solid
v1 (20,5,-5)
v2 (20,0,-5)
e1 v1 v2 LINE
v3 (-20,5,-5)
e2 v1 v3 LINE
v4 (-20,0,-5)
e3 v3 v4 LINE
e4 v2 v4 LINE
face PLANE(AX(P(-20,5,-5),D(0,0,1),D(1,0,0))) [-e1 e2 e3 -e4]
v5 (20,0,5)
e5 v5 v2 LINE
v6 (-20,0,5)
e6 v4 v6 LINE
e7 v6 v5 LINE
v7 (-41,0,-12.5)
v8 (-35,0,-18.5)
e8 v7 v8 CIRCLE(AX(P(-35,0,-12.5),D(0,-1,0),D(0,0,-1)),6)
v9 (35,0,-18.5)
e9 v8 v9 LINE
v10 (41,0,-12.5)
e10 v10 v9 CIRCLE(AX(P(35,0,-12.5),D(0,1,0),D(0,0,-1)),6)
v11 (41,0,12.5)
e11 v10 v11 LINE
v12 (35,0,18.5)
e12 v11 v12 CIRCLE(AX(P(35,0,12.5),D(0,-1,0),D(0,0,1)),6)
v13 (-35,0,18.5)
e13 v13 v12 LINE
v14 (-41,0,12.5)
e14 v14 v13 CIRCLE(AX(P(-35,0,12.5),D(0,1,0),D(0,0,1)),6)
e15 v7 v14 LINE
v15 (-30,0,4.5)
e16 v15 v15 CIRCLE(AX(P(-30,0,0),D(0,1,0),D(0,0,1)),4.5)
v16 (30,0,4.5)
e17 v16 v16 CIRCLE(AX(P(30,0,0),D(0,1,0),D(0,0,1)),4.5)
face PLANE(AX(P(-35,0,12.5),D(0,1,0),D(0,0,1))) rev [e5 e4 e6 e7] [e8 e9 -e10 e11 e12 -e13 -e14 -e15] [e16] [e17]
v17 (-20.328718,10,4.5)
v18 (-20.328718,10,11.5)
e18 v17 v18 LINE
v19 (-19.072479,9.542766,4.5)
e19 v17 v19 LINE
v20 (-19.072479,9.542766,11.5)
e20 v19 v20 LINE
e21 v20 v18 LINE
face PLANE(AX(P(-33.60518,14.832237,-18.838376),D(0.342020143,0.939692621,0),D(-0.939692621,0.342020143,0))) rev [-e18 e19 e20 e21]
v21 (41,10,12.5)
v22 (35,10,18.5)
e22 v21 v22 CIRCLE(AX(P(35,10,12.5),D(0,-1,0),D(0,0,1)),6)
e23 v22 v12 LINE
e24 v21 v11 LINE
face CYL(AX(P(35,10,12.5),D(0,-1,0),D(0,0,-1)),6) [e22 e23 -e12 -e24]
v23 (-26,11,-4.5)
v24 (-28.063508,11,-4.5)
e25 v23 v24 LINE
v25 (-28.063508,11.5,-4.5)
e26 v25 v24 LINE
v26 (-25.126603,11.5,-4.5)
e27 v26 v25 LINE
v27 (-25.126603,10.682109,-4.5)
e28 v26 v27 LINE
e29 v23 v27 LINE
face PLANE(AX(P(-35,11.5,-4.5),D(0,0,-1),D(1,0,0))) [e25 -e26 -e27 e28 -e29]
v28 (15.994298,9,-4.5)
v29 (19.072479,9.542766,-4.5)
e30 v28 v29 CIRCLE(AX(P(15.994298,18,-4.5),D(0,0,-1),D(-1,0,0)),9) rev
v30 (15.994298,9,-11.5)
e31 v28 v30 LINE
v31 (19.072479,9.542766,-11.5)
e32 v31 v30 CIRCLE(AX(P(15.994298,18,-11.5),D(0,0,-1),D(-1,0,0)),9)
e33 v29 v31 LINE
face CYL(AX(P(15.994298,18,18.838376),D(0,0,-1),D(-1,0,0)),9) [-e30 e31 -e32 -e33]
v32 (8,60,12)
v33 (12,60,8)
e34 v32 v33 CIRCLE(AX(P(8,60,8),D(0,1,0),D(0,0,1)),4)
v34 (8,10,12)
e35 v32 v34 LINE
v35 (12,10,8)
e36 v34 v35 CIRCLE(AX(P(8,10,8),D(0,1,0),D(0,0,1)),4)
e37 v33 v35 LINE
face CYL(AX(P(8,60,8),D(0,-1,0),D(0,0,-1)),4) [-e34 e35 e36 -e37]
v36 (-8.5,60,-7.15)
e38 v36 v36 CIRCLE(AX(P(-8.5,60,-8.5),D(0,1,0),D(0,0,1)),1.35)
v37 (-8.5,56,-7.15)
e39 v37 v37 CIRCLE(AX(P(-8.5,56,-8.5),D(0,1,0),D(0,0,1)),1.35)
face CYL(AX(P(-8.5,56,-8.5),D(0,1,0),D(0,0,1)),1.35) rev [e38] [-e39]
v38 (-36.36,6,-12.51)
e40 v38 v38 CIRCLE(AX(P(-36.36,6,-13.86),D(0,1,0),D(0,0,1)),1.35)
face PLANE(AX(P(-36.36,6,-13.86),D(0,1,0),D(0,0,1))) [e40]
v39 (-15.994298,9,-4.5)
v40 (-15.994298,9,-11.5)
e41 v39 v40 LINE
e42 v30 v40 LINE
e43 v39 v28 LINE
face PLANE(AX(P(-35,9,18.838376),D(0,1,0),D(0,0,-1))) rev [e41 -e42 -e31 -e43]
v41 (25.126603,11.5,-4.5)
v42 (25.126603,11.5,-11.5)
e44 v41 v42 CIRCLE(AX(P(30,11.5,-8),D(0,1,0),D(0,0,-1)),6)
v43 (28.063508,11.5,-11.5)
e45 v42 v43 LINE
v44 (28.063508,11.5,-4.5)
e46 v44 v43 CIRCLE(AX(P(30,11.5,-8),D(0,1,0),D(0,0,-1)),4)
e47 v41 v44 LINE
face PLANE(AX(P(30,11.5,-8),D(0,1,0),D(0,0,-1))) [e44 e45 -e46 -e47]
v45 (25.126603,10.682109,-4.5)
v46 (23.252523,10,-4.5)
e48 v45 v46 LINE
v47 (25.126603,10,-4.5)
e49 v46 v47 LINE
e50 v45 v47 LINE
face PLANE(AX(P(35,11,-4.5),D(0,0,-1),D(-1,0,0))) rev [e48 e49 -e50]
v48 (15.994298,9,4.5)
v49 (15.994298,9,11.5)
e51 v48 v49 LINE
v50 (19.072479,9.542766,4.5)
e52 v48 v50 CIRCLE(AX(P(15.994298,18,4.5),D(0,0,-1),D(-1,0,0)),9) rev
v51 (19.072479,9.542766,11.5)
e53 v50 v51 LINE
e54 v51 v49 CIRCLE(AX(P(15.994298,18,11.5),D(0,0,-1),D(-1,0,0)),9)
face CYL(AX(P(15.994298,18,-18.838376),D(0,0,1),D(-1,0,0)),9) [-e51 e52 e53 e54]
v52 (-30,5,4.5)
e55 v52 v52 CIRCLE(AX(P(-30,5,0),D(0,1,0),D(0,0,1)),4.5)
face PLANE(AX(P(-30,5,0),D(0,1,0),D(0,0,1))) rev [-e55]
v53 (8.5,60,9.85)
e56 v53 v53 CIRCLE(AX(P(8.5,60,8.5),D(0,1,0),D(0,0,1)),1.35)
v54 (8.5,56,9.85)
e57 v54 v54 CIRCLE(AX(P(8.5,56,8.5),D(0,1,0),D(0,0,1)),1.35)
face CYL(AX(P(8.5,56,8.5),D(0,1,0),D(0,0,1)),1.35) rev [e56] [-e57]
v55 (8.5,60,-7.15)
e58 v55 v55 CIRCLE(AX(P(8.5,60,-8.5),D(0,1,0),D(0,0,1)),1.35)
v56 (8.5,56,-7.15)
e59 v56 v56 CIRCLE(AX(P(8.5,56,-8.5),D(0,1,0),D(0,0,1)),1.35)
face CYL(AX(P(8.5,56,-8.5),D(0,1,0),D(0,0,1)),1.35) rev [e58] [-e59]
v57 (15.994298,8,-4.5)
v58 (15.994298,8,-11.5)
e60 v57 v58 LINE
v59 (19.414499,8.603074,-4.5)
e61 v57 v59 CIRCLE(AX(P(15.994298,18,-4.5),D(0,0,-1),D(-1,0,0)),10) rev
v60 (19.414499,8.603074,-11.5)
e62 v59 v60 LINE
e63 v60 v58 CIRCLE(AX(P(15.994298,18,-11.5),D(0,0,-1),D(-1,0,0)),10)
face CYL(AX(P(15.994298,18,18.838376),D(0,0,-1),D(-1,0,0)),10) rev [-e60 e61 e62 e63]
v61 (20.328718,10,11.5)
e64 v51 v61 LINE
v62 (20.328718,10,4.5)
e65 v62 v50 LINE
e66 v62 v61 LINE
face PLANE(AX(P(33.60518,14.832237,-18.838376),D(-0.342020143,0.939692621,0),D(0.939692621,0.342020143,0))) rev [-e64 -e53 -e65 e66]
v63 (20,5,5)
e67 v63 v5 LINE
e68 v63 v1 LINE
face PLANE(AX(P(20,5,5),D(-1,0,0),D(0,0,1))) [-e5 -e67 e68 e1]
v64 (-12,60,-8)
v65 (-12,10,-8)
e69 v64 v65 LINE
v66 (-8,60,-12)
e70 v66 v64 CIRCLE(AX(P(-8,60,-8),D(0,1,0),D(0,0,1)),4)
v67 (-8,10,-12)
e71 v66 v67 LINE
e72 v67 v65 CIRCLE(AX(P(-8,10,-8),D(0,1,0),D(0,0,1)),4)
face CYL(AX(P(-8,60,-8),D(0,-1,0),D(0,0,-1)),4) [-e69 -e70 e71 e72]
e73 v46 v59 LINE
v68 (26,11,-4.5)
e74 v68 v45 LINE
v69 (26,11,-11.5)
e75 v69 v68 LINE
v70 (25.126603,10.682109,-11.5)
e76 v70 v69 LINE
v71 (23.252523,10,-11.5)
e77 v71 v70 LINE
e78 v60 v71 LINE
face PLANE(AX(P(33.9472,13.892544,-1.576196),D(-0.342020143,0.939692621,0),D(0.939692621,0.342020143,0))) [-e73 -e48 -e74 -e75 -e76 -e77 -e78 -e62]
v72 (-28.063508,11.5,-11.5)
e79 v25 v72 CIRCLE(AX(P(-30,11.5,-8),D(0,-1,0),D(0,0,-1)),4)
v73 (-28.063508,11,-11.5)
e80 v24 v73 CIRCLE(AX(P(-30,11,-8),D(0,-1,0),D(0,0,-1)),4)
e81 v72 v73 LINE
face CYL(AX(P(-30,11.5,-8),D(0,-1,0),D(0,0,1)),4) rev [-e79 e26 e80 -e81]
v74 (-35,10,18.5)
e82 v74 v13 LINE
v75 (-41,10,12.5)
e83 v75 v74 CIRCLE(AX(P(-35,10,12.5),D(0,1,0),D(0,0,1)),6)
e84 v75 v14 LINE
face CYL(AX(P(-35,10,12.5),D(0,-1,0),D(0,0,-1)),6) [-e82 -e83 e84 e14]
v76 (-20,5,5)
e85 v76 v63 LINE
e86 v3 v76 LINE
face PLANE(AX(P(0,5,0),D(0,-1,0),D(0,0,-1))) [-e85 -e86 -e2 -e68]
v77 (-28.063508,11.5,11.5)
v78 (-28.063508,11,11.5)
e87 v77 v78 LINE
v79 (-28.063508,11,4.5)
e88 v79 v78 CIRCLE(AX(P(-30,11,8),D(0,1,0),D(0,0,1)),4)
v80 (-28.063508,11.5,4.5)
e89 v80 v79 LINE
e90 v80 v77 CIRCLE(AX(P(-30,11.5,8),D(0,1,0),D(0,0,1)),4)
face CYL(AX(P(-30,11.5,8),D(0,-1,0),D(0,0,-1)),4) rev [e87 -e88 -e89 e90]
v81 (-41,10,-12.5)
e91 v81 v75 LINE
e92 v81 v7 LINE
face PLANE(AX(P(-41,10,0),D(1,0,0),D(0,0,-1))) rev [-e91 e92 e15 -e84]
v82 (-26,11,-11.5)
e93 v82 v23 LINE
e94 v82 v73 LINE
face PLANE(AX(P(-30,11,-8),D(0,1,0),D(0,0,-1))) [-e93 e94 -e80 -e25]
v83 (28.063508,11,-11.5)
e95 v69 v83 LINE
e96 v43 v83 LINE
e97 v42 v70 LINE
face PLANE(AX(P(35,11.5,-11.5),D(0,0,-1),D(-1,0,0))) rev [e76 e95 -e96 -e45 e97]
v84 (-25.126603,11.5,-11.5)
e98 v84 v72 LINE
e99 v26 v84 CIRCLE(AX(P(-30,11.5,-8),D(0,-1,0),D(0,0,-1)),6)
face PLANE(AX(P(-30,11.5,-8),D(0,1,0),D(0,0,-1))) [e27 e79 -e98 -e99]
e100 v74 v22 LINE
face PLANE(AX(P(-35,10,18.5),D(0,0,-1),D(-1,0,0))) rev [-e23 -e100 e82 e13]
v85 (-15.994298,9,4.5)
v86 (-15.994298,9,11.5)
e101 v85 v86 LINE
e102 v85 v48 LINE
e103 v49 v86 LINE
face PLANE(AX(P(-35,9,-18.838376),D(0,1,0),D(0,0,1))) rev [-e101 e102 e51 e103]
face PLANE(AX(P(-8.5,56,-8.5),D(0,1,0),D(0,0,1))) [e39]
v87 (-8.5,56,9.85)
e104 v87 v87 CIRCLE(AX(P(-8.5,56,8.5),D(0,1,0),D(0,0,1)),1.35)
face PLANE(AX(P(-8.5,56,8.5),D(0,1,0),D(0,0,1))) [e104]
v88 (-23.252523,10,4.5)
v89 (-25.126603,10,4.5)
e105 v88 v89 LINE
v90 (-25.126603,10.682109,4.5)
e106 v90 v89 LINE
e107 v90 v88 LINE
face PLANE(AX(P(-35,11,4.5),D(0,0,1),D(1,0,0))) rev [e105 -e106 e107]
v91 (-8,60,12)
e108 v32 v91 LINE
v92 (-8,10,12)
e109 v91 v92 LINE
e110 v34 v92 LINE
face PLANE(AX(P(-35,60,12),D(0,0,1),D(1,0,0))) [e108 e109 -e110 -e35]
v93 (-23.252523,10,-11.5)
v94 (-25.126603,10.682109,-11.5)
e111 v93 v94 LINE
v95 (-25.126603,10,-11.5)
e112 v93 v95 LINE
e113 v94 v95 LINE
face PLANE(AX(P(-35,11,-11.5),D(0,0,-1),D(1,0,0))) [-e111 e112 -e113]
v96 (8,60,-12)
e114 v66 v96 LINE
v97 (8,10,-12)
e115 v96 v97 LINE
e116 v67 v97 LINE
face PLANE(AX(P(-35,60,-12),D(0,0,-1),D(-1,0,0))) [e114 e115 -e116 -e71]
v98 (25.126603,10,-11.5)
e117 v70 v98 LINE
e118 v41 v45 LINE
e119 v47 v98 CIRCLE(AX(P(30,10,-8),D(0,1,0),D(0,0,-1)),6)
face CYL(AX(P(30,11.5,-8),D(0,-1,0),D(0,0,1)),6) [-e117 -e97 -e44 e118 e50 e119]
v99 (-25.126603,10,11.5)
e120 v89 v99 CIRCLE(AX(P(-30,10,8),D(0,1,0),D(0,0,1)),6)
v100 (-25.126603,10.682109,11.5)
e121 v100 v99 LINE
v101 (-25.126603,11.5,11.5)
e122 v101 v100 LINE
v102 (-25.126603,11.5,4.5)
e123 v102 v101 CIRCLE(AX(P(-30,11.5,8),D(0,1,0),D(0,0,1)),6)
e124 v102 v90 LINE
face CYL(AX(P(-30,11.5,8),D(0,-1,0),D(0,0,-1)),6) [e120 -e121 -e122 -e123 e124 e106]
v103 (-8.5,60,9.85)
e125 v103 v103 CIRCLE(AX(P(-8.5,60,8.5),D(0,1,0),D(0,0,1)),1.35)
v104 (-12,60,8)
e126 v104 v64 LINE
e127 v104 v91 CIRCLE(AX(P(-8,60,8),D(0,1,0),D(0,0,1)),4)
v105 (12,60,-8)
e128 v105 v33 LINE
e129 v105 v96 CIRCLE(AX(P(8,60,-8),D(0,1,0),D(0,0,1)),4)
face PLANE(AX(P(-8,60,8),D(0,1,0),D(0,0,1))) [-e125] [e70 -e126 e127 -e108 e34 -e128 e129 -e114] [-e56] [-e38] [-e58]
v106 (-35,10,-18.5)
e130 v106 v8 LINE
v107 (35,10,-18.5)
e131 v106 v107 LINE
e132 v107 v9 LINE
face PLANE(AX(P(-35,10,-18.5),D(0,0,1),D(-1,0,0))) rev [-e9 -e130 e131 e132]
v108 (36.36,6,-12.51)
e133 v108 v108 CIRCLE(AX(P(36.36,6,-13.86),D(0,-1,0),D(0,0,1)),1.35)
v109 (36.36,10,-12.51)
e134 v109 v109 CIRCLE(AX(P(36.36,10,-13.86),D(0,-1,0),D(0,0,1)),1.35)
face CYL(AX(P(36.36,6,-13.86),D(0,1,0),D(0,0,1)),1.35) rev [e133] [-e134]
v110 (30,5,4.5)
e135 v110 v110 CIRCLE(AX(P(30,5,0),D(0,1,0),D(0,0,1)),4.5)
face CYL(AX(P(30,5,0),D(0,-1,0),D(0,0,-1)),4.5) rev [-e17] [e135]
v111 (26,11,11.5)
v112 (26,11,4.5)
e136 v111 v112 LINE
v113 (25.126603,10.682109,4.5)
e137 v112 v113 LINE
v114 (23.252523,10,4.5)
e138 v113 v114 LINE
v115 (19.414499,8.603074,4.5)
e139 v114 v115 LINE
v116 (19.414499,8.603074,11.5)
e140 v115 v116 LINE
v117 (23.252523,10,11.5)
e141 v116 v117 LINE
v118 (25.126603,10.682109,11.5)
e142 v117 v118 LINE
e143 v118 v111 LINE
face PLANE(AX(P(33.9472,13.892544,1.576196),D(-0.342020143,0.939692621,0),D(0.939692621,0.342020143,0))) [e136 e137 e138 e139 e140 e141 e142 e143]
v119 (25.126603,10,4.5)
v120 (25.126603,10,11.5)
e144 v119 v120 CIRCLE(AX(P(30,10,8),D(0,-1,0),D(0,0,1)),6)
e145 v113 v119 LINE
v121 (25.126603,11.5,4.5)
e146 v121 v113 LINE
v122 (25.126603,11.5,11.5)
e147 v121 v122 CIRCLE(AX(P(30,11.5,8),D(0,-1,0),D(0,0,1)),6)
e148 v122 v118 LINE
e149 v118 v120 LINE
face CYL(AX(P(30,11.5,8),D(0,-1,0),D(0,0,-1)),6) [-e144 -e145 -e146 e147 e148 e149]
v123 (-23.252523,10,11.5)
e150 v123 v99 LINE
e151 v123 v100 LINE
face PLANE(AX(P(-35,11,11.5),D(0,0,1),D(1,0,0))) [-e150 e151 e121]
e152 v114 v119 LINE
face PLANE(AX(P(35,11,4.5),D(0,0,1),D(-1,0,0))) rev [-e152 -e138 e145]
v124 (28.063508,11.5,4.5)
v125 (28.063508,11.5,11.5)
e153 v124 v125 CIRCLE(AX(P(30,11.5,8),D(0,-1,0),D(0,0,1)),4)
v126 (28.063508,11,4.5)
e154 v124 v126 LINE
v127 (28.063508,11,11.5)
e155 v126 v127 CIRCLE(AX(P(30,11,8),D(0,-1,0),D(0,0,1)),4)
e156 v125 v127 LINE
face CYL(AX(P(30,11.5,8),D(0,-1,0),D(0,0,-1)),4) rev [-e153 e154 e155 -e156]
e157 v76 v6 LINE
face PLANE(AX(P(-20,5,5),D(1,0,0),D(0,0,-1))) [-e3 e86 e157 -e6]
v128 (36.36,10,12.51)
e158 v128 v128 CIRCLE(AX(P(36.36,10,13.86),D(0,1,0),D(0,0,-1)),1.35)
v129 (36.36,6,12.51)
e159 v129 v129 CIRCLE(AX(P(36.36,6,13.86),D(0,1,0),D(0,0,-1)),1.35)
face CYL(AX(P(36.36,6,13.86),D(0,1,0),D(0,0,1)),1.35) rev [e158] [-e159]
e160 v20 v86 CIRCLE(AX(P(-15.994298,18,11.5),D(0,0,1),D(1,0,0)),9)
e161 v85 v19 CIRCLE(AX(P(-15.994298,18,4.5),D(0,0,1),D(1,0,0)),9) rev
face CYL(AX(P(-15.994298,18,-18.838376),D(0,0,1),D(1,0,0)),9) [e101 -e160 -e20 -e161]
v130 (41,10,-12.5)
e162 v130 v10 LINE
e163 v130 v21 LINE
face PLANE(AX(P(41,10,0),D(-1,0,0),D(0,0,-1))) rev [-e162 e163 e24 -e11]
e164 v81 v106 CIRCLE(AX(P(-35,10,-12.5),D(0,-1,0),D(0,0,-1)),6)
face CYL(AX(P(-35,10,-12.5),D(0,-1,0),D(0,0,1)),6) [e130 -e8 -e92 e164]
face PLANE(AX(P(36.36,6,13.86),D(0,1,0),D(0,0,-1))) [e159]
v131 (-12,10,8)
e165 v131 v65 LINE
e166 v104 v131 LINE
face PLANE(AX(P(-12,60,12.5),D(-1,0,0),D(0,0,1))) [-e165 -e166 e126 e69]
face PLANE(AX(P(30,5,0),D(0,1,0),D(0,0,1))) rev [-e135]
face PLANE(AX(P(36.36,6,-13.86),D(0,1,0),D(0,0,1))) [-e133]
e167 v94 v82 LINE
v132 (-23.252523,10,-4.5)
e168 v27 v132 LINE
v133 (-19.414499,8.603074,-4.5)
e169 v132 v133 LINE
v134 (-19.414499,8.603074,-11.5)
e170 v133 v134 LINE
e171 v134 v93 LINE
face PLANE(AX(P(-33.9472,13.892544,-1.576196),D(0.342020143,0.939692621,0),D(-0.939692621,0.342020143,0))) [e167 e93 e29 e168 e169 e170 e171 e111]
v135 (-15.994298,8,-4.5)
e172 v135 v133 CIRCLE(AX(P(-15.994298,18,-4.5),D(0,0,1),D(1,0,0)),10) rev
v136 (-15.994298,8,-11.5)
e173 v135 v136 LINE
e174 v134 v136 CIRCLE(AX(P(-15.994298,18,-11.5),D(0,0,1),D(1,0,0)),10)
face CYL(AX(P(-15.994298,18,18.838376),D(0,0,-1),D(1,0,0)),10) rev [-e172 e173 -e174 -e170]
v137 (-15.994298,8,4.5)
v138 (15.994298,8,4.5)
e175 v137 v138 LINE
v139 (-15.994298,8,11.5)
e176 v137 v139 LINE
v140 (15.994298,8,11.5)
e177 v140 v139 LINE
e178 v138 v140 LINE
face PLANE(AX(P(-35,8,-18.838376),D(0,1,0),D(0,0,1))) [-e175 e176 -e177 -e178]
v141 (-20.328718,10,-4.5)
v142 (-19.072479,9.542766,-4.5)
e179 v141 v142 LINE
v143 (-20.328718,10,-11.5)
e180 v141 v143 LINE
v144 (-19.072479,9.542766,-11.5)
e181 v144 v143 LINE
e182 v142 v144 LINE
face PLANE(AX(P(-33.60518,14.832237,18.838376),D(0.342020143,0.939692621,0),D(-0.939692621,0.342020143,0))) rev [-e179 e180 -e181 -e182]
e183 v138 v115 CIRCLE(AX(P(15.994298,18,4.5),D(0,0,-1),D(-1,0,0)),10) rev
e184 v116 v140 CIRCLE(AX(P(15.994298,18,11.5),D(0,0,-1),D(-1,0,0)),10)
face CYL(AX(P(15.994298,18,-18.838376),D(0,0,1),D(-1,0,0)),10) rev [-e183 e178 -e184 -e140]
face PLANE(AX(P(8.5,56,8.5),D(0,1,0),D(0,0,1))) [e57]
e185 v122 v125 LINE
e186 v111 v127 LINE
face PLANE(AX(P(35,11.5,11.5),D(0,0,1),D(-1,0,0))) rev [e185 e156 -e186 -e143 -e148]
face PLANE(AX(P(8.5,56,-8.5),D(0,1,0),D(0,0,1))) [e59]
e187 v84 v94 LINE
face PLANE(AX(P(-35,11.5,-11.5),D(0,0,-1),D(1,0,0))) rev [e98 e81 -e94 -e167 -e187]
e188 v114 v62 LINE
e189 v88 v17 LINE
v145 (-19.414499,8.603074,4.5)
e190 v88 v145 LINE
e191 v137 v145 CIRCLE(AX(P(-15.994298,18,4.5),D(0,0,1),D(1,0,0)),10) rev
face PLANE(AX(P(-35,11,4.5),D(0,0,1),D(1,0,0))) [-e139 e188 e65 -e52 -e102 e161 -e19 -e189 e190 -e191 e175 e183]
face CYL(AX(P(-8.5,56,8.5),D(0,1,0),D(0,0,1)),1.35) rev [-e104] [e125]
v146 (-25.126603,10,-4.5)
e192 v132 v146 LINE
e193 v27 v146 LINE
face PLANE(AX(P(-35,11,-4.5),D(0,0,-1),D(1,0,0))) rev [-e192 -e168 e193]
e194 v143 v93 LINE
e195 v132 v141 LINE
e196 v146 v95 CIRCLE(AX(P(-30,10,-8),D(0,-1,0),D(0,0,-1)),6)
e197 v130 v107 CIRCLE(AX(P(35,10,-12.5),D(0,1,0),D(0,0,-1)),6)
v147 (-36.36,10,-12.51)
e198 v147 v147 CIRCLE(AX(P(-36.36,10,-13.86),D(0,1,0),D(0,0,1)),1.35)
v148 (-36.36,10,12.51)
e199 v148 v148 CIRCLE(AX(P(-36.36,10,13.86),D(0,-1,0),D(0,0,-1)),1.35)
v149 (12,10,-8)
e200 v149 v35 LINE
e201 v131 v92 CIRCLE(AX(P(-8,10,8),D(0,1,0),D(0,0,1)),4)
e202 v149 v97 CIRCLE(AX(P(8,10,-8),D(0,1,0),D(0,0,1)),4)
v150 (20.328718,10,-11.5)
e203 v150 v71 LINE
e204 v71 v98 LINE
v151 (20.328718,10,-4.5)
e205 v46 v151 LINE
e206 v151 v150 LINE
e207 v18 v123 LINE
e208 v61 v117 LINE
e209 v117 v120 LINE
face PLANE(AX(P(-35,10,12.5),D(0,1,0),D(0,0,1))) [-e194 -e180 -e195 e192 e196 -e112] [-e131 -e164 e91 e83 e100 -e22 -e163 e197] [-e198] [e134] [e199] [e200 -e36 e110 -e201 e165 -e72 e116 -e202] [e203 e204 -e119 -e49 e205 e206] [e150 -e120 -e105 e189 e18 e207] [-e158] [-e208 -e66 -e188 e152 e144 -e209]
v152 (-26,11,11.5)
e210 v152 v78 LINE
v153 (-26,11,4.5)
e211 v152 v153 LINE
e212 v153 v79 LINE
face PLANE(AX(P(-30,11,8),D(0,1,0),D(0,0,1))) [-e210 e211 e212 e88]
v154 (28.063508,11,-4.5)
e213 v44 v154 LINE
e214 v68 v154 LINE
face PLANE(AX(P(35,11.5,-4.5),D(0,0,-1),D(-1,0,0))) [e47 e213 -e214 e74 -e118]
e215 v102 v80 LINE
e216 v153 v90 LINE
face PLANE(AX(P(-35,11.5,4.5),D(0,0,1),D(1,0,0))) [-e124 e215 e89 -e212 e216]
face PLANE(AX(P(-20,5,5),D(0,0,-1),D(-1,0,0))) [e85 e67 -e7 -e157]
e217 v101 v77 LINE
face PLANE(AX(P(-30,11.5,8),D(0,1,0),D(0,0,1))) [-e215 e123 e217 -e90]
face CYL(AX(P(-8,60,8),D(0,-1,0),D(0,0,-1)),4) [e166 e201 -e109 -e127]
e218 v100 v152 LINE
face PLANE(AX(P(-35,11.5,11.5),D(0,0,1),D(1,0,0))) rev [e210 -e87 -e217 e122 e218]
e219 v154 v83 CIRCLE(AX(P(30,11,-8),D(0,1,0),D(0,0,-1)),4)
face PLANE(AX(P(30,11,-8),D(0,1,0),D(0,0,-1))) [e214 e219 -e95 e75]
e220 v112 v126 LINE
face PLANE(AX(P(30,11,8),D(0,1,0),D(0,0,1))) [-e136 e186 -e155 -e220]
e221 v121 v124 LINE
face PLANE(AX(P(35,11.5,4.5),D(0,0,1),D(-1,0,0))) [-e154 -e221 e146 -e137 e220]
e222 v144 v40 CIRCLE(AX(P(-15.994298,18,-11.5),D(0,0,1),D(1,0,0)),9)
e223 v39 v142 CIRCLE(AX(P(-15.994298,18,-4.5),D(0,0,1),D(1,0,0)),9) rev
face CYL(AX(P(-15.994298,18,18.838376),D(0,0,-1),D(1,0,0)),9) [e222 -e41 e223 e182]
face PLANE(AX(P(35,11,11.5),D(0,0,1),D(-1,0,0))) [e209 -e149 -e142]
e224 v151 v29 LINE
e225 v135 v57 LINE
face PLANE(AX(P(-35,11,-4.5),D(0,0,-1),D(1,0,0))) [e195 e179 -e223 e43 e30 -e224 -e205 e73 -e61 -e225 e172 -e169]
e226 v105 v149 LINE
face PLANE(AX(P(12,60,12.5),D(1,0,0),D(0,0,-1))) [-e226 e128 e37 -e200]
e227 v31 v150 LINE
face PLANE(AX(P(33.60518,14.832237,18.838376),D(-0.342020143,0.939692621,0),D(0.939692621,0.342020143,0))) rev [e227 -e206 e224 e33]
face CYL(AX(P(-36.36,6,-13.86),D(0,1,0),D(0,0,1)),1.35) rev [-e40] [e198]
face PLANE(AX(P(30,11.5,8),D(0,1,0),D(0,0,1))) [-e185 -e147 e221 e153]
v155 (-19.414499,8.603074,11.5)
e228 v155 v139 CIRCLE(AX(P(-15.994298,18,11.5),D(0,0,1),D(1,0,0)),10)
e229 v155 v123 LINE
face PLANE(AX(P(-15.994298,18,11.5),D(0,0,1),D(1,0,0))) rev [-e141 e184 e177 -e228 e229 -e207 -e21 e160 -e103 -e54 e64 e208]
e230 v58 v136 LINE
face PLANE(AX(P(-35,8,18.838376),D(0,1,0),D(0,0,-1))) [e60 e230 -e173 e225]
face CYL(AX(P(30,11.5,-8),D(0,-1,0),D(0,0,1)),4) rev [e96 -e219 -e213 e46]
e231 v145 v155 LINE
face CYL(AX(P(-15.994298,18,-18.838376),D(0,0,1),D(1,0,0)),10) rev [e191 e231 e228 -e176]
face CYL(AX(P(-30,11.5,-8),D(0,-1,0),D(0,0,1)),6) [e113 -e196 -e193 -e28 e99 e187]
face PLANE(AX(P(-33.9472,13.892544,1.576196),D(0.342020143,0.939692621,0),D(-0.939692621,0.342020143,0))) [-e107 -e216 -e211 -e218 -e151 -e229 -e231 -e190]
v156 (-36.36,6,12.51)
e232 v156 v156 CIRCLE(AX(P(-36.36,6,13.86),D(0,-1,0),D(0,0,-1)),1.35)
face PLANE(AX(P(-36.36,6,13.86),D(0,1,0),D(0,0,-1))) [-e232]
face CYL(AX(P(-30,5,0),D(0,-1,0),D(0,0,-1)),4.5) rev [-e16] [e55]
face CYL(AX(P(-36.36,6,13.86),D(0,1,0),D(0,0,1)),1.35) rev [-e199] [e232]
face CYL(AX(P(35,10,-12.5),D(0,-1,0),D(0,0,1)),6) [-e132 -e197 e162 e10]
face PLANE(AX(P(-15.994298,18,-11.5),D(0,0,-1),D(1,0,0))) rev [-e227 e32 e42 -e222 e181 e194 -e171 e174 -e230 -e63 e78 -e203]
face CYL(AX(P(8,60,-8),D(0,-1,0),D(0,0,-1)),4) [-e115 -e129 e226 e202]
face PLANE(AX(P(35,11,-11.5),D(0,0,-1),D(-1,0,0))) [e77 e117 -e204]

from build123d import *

# Parameters (mm, degrees)
BOSS_EXTRUDE1_DEPTH                        = 10
BOSS_EXTRUDE2_START                        = 10
SKETCH4_R                                  = 4
BOSS_EXTRUDE2_DEPTH                        = 1
BOSS_EXTRUDE4_START                        = 11.5
BOSS_EXTRUDE4_DEPTH                        = 7
CUT_EXTRUDE2_START                         = 11.5
CUT_EXTRUDE2_DEPTH                         = 7
BOSS_EXTRUDE3_START                        = 10
BOSS_EXTRUDE3_DEPTH                        = 1.5
MIRROR4_DEPTH                              = 8
MIRROR4_START                              = 8
MIRROR4_2_DEPTH                            = 2
MIRROR4_START_2                            = 10
MIRROR4_3_DEPTH                            = 1.5
MIRROR4_4_DEPTH                            = 3
MIRROR4_START_3                            = -11.5
MIRROR4_5_DEPTH                            = 7
MIRROR4_START_4                            = 4.5
MIRROR4_6_DEPTH                            = 7
SKETCH2_R                                  = 4.5
SKETCH2_W                                  = 40
SKETCH2_H                                  = 10
CUT_EXTRUDE1_DEPTH                         = 5
BOSS_EXTRUDE5_START                        = 10
BOSS_EXTRUDE5_DEPTH                        = 50
SKETCH8_R                                  = 1.35
CUT_EXTRUDE3_DEPTH                         = 4
SKETCH9_R                                  = 1.35
CUT_EXTRUDE4_DEPTH                         = 4
MIRROR5_AT_THE_SECOND_PLANE_COPY_1_SKETC_R = 1.35
MIRROR5_AT_THE_SECOND_PLANE_COPY_1_DEPTH   = 4


with BuildPart() as part:
    # Sketch3 → Boss-Extrude1 (new body)
    with BuildSketch(Plane(origin=(0, 0, 0), x_dir=(1, 0, 0), z_dir=(0, 1, 0))):
        with BuildLine():
            Line((-41, 0), (-41, -12.5))
            ThreePointArc((-41, -12.5), (-39.242640687, -16.742640687), (-35, -18.5))
            Line((-35, -18.5), (0, -18.5))
            Line((0, -18.5), (0, 0))
            Line((0, 0), (-41, 0))
        make_face()
    extrude(amount=BOSS_EXTRUDE1_DEPTH)

    # Sketch4 → Boss-Extrude2 (add)
    with BuildSketch(Plane(origin=(0, 0, 0), x_dir=(1, 0, 0), z_dir=(0, 1, 0)).offset(BOSS_EXTRUDE2_START)):
        with Locations((-30, -8)):
            Circle(SKETCH4_R)
        with BuildLine():
            Line((-26, -4.5), (-28.063508327, -4.5))
            ThreePointArc((-28.063508327, -4.5), (-26.554280431, -5.968493994), (-26, -8))
            Line((-26, -8), (-26, -4.5))
        make_face()
        with BuildLine():
            Line((-26, -11.5), (-26, -8))
            ThreePointArc((-26, -8), (-26.554280431, -10.031506006), (-28.063508327, -11.5))
            Line((-28.063508327, -11.5), (-26, -11.5))
        make_face()
    extrude(amount=BOSS_EXTRUDE2_DEPTH)

    # Sketch6 → Boss-Extrude4 (add)
    with BuildSketch(Plane.XY.offset(BOSS_EXTRUDE4_START)):
        Polygon((-23.252522581, 10), (-26, 11), (-26, 10), align=None)
    extrude(amount=-BOSS_EXTRUDE4_DEPTH)

    # Sketch6<3> → Cut-Extrude2 (cut)
    with BuildSketch(Plane.XY.offset(CUT_EXTRUDE2_START)):
        with BuildLine():
            Line((-20.32871818, 10), (-23.252522581, 10))
            Line((-23.252522581, 10), (-19.414499368, 8.603073792))
            ThreePointArc((-19.414499368, 8.603073792), (-17.730779711, 8.15192247), (-15.994297935, 8))
            Line((-15.994297935, 8), (0, 8))
            Line((0, 8), (0, 9))
            Line((0, 9), (-15.994297935, 9))
            ThreePointArc((-15.994297935, 9), (-17.557131534, 9.136730223), (-19.072479224, 9.542766413))
            Line((-19.072479224, 9.542766413), (-20.32871818, 10))
        make_face()
    extrude(amount=-CUT_EXTRUDE2_DEPTH, mode=Mode.SUBTRACT)

    # Sketch4<3> → Boss-Extrude3 (add)
    with BuildSketch(Plane(origin=(0, 0, 0), x_dir=(1, 0, 0), z_dir=(0, 1, 0)).offset(BOSS_EXTRUDE3_START)):
        with BuildLine():
            ThreePointArc((-28.063508327, -11.5), (-34, -8), (-28.063508327, -4.5))
            Line((-28.063508327, -4.5), (-26, -4.5))
            Line((-26, -4.5), (-25.126602828, -4.5))
            ThreePointArc((-25.126602828, -4.5), (-36, -8), (-25.126602828, -11.5))
            Line((-25.126602828, -11.5), (-26, -11.5))
            Line((-26, -11.5), (-28.063508327, -11.5))
        make_face()
    extrude(amount=BOSS_EXTRUDE3_DEPTH)

    # Mirror4: read off the stored shape, not the designer's step
    # Mirror4 outline → Mirror4 (add)
    with BuildSketch(Plane(origin=(0, 0, 0), x_dir=(1, 0, 0), z_dir=(0, 1, 0))):
        with BuildLine():
            Line((0, -18.5), (35, -18.5))
            ThreePointArc((35, -18.5), (39.242640687, -16.742640687), (41, -12.5))
            Line((41, -12.5), (41, 12.5))
            ThreePointArc((41, 12.5), (39.242640687, 16.742640687), (35, 18.5))
            Line((35, 18.5), (-35, 18.5))
            ThreePointArc((-35, 18.5), (-39.242640687, 16.742640687), (-41, 12.5))
            Line((-41, 12.5), (-41, 0))
            Line((-41, 0), (0, 0))
            Line((0, 0), (0, -18.5))
        make_face()
    extrude(amount=MIRROR4_DEPTH)

    # Mirror4 2 outline → Mirror4 2 (add)
    with BuildSketch(Plane(origin=(0, 0, 0), x_dir=(1, 0, 0), z_dir=(0, 1, 0)).offset(MIRROR4_START)):
        with BuildLine():
            Line((0, -11.5), (0, -18.5))
            Line((0, -18.5), (35, -18.5))
            ThreePointArc((35, -18.5), (39.242640687, -16.742640687), (41, -12.5))
            Line((41, -12.5), (41, 12.5))
            ThreePointArc((41, 12.5), (39.242640687, 16.742640687), (35, 18.5))
            Line((35, 18.5), (-35, 18.5))
            ThreePointArc((-35, 18.5), (-39.242640687, 16.742640687), (-41, 12.5))
            Line((-41, 12.5), (-41, 0))
            Line((-41, 0), (0, 0))
            Line((0, 0), (0, -4.5))
            Line((0, -4.5), (28.063508327, -4.5))
            ThreePointArc((28.063508327, -4.5), (34, -8), (28.063508327, -11.5))
            Line((28.063508327, -11.5), (0, -11.5))
        make_face()
        with BuildLine():
            ThreePointArc((28.063508327, 11.5), (34, 8), (28.063508327, 4.5))
            Line((28.063508327, 4.5), (-28.063508327, 4.5))
            ThreePointArc((-28.063508327, 4.5), (-34, 8), (-28.063508327, 11.5))
            Line((-28.063508327, 11.5), (28.063508327, 11.5))
        make_face(mode=Mode.SUBTRACT)
    extrude(amount=MIRROR4_2_DEPTH)

    # Mirror4 3 outline → Mirror4 3 (add)
    with BuildSketch(Plane(origin=(0, 0, 0), x_dir=(1, 0, 0), z_dir=(0, 1, 0)).offset(MIRROR4_START_2)):
        with BuildLine():
            Line((28.063508327, -11.5), (25.126602828, -11.5))
            ThreePointArc((25.126602828, -11.5), (36, -8), (25.126602828, -4.5))
            Line((25.126602828, -4.5), (28.063508327, -4.5))
            ThreePointArc((28.063508327, -4.5), (34, -8), (28.063508327, -11.5))
        make_face()
        with BuildLine():
            Line((-28.063508327, 11.5), (-25.126602828, 11.5))
            ThreePointArc((-25.126602828, 11.5), (-36, 8), (-25.126602828, 4.5))
            Line((-25.126602828, 4.5), (-28.063508327, 4.5))
            ThreePointArc((-28.063508327, 4.5), (-34, 8), (-28.063508327, 11.5))
        make_face()
        with BuildLine():
            ThreePointArc((25.126602828, 4.5), (36, 8), (25.126602828, 11.5))
            Line((25.126602828, 11.5), (28.063508327, 11.5))
            ThreePointArc((28.063508327, 11.5), (34, 8), (28.063508327, 4.5))
            Line((28.063508327, 4.5), (25.126602828, 4.5))
        make_face()
    extrude(amount=MIRROR4_3_DEPTH)

    # Mirror4 4 outline → Mirror4 4 (add)
    with BuildSketch(Plane(origin=(0, 0, 0), x_dir=(1, 0, 0), z_dir=(0, 1, 0)).offset(MIRROR4_START)):
        with BuildLine():
            Line((0, -11.5), (28.063508327, -11.5))
            ThreePointArc((28.063508327, -11.5), (34, -8), (28.063508327, -4.5))
            Line((28.063508327, -4.5), (0, -4.5))
            Line((0, -4.5), (0, -11.5))
        make_face()
        with BuildLine():
            Line((28.063508327, 11.5), (-28.063508327, 11.5))
            ThreePointArc((-28.063508327, 11.5), (-34, 8), (-28.063508327, 4.5))
            Line((-28.063508327, 4.5), (28.063508327, 4.5))
            ThreePointArc((28.063508327, 4.5), (34, 8), (28.063508327, 11.5))
        make_face()
    extrude(amount=MIRROR4_4_DEPTH)

    # Mirror4 5 outline → Mirror4 5 (cut)
    with BuildSketch(Plane.XY.offset(MIRROR4_START_3)):
        with BuildLine():
            Line((26, 11), (-26, 11))
            Line((-26, 11), (-19.414499368, 8.603073792))
            ThreePointArc((-19.414499368, 8.603073792), (-17.730779711, 8.15192247), (-15.994297935, 8))
            Line((-15.994297935, 8), (15.994297935, 8))
            ThreePointArc((15.994297935, 8), (17.730779711, 8.15192247), (19.414499368, 8.603073792))
            Line((19.414499368, 8.603073792), (26, 11))
        make_face()
        with BuildLine():
            Line((20.32871818, 10), (19.072479224, 9.542766413))
            ThreePointArc((19.072479224, 9.542766413), (17.557131534, 9.136730223), (15.994297935, 9))
            Line((15.994297935, 9), (-15.994297935, 9))
            ThreePointArc((-15.994297935, 9), (-17.557131534, 9.136730223), (-19.072479224, 9.542766413))
            Line((-19.072479224, 9.542766413), (-20.32871818, 10))
            Line((-20.32871818, 10), (20.32871818, 10))
        make_face(mode=Mode.SUBTRACT)
    extrude(amount=MIRROR4_5_DEPTH, mode=Mode.SUBTRACT)

    # Mirror4 6 outline → Mirror4 6 (cut)
    with BuildSketch(Plane.XY.offset(MIRROR4_START_4)):
        with BuildLine():
            Line((0, 10), (20.32871818, 10))
            Line((20.32871818, 10), (19.072479224, 9.542766413))
            ThreePointArc((19.072479224, 9.542766413), (17.557131534, 9.136730223), (15.994297935, 9))
            Line((15.994297935, 9), (0, 9))
            Line((0, 9), (0, 8))
            Line((0, 8), (15.994297935, 8))
            ThreePointArc((15.994297935, 8), (17.730779711, 8.15192247), (19.414499368, 8.603073792))
            Line((19.414499368, 8.603073792), (26, 11))
            Line((26, 11), (0, 11))
            Line((0, 11), (0, 10))
        make_face()
    extrude(amount=MIRROR4_6_DEPTH, mode=Mode.SUBTRACT)

    # Sketch2 → Cut-Extrude1 (cut)
    with BuildSketch(Plane(origin=(0, 0, 0), x_dir=(1, 0, 0), z_dir=(0, 1, 0))):
        with Locations(Location((-30, 0, 0), (0, 0, 270))):
            Circle(SKETCH2_R)
        with Locations(Location((30, 0, 0), (0, 0, 270))):
            Circle(SKETCH2_R)
        Rectangle(SKETCH2_W, SKETCH2_H)
    extrude(amount=CUT_EXTRUDE1_DEPTH, mode=Mode.SUBTRACT)

    # Sketch7 → Boss-Extrude5 (add)
    with BuildSketch(Plane(origin=(0, 0, 0), x_dir=(1, 0, 0), z_dir=(0, 1, 0)).offset(BOSS_EXTRUDE5_START)):
        with BuildLine():
            Line((-8, -12), (8, -12))
            ThreePointArc((8, -12), (10.828427125, -10.828427125), (12, -8))
            Line((12, -8), (12, 8))
            ThreePointArc((12, 8), (10.828427125, 10.828427125), (8, 12))
            Line((8, 12), (-8, 12))
            ThreePointArc((-8, 12), (-10.828427125, 10.828427125), (-12, 8))
            Line((-12, 8), (-12, -8))
            ThreePointArc((-12, -8), (-10.828427125, -10.828427125), (-8, -12))
        make_face()
    extrude(amount=BOSS_EXTRUDE5_DEPTH)

    # Sketch8 → Cut-Extrude3 (cut)
    with BuildSketch(Plane(origin=(0, 60, 0), x_dir=(1, 0, 0), z_dir=(0, 1, 0))):
        with Locations(Location((-8.5, 8.5, 0), (0, 0, 270))):
            Circle(SKETCH8_R)
        with Locations(Location((-8.5, -8.5, 0), (0, 0, 270))):
            Circle(SKETCH8_R)
        with Locations(Location((8.5, 8.5, 0), (0, 0, 270))):
            Circle(SKETCH8_R)
        with Locations(Location((8.5, -8.5, 0), (0, 0, 270))):
            Circle(SKETCH8_R)
    extrude(amount=-CUT_EXTRUDE3_DEPTH, mode=Mode.SUBTRACT)

    # Sketch9 → Cut-Extrude4 (cut)
    with BuildSketch(Plane(origin=(0, 10, 0), x_dir=(1, 0, 0), z_dir=(0, 1, 0))):
        with Locations(Location((-36.36, 13.86, 0), (0, 0, 270))):
            Circle(SKETCH9_R)
    cut_extrude4 = extrude(amount=-CUT_EXTRUDE4_DEPTH, mode=Mode.SUBTRACT)

    # Mirror5: Cut-Extrude4 across plane
    add(cut_extrude4.mirror(Plane.XY), mode=Mode.SUBTRACT)

    # Mirror5 at the second plane: Cut-Extrude4 across plane
    add(cut_extrude4.mirror(Plane(origin=(0, 0, 0), x_dir=(0, 0, 1), z_dir=(1, 0, 0))), mode=Mode.SUBTRACT)

    # Mirror5 at the second plane copy 1 sketc → Mirror5 at the second plane copy 1 (cut)
    with BuildSketch(Plane(origin=(0, 10, 0), x_dir=(-1, 0, 0), z_dir=(0, 1, 0))):
        with Locations(Location((-36.36, 13.86, 0), (0, 0, 270))):
            Circle(MIRROR5_AT_THE_SECOND_PLANE_COPY_1_SKETC_R)
    extrude(amount=-MIRROR5_AT_THE_SECOND_PLANE_COPY_1_DEPTH, mode=Mode.SUBTRACT)


solid = part.part
